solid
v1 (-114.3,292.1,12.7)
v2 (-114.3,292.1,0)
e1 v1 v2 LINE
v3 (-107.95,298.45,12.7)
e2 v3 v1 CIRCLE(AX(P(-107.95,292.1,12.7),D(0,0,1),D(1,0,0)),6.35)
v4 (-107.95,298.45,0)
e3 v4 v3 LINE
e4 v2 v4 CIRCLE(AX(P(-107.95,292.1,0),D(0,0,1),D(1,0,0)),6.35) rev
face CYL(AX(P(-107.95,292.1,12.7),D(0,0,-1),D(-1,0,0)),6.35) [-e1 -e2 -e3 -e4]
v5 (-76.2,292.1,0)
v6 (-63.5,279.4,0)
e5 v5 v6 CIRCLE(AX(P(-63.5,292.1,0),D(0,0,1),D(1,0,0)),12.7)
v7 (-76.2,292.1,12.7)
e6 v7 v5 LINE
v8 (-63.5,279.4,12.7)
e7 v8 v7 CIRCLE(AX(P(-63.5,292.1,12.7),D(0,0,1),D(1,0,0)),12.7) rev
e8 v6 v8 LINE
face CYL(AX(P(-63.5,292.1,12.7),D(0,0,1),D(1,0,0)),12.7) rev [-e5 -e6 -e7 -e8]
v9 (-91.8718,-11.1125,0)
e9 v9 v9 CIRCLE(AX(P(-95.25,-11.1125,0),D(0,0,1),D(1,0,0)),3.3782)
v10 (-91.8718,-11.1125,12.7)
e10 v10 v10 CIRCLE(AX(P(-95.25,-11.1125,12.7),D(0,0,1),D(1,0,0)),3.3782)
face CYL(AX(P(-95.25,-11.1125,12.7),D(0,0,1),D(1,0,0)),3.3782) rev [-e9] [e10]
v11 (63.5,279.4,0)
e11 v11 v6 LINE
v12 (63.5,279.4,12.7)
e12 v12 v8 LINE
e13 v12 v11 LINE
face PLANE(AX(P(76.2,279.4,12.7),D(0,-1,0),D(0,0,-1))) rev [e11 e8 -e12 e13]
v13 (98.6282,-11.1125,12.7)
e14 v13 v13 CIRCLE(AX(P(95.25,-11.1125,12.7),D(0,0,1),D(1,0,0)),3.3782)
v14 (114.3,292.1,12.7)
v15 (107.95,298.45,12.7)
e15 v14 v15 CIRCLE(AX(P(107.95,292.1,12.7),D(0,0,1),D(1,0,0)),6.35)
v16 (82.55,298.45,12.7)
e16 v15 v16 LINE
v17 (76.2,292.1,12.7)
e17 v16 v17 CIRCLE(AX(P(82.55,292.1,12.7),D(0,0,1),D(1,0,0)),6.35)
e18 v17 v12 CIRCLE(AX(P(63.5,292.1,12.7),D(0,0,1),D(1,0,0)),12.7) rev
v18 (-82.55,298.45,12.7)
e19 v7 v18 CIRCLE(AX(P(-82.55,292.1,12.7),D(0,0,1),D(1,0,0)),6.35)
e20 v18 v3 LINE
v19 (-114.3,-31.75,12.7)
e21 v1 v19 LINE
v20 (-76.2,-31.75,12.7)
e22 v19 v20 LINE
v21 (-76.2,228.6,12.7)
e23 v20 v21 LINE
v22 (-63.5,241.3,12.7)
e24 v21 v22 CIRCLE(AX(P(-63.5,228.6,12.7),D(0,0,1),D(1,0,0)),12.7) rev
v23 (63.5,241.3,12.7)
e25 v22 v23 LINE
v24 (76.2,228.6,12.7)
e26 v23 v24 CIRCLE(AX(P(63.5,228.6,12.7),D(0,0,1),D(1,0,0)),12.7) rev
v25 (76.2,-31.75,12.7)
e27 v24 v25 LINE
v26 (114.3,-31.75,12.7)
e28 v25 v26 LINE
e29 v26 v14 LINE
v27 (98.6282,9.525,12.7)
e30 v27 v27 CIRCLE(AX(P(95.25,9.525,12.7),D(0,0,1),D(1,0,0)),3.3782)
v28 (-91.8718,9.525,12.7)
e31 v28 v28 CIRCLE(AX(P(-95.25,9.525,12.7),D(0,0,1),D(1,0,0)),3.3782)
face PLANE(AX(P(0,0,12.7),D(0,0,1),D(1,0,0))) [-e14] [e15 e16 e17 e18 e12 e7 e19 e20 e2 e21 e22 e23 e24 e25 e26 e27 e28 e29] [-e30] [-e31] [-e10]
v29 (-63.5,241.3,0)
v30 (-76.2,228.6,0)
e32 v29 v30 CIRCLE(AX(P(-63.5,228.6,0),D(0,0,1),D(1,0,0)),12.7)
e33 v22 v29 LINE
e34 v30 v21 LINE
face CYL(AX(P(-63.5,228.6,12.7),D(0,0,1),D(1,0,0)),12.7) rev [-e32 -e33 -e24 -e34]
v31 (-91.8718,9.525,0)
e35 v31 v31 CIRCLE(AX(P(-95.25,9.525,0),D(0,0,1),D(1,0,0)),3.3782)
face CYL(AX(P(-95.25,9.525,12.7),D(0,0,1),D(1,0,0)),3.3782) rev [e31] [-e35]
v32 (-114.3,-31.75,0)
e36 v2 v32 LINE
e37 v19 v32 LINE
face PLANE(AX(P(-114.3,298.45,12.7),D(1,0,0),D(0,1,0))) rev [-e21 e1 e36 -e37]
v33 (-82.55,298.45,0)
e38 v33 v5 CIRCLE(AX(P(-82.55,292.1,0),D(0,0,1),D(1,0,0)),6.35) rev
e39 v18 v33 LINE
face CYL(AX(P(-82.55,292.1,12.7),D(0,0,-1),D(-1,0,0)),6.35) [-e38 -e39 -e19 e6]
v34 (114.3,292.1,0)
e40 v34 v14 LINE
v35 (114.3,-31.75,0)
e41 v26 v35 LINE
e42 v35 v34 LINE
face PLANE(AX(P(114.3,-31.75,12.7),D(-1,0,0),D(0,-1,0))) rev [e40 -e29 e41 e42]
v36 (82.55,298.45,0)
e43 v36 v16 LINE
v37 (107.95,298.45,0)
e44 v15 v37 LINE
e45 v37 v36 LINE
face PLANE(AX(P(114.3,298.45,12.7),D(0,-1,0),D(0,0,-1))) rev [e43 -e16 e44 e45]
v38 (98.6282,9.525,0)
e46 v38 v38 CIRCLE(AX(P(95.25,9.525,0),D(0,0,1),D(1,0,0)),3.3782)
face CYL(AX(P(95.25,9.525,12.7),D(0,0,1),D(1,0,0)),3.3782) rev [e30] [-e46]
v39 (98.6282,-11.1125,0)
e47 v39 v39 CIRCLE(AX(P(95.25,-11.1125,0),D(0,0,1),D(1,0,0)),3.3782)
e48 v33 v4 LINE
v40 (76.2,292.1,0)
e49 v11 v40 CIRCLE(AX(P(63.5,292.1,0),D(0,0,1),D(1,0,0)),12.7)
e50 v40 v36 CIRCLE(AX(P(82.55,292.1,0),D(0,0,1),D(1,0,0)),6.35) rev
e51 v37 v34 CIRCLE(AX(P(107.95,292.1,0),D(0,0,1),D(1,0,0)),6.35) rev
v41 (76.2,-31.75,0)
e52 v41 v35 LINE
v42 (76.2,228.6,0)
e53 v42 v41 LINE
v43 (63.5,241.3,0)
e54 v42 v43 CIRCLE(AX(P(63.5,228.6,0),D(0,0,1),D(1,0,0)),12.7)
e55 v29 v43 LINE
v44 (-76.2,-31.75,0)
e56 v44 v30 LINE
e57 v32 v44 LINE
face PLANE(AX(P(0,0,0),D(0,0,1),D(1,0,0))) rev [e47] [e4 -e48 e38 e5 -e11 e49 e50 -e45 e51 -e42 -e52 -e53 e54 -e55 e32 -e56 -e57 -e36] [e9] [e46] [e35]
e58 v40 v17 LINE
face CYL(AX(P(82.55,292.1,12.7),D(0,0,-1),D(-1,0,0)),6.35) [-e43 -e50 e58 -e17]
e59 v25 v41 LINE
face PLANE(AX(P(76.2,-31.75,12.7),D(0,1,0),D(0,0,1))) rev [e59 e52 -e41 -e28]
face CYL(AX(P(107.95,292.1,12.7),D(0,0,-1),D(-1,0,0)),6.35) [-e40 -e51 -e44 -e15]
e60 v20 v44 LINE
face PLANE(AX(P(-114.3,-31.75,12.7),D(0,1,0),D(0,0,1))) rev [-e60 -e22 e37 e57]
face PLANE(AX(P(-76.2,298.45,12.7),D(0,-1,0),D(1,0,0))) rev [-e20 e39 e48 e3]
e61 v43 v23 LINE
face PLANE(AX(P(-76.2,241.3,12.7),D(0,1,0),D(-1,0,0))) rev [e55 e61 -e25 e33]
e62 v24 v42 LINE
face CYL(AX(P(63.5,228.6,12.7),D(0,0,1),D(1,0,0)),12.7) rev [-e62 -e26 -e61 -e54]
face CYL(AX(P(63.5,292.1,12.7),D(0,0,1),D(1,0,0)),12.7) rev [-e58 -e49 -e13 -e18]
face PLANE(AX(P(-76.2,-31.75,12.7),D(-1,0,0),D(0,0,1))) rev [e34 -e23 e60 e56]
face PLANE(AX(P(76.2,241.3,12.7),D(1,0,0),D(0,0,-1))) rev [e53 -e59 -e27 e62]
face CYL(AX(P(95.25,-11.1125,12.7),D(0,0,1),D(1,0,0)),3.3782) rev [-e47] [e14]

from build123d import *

# Parameters (mm, degrees)
BOSS_EXTRUDE1_DEPTH         = 12.7
F_1_4_CLEARANCE_HOLE1_D     = 6.7564
F_1_4_CLEARANCE_HOLE1_DEPTH = 219.964
F_1_4_CLEARANCE_HOLE1_TIP   = 2.029827343
FILLET1_R                   = 12.7
FILLET2_R                   = 6.35


with BuildPart() as part:
    # Sketch1 → Boss-Extrude1 (new body)
    with BuildSketch(Plane.XY):
        Polygon((-114.3, -31.75), (-76.2, -31.75), (-76.2, 241.3), (76.2, 241.3), (76.2, -31.75), (114.3, -31.75), (114.3, 298.45), (76.2, 298.45), (76.2, 279.4), (-76.2, 279.4), (-76.2, 298.45), (-114.3, 298.45), align=None)
    extrude(amount=BOSS_EXTRUDE1_DEPTH)

    # 1/4 Clearance Hole1
    with Locations(Plane.XY.offset(12.7)):
        with Locations((-95.25, -11.1125), (-95.25, 9.525), (95.25, -11.1125), (95.25, 9.525)):
            Hole(F_1_4_CLEARANCE_HOLE1_D / 2, depth=F_1_4_CLEARANCE_HOLE1_DEPTH)
            with Locations((0, 0, -(F_1_4_CLEARANCE_HOLE1_DEPTH + F_1_4_CLEARANCE_HOLE1_TIP / 2))):  # 118° drill point
                Cone(0, F_1_4_CLEARANCE_HOLE1_D / 2, F_1_4_CLEARANCE_HOLE1_TIP, mode=Mode.SUBTRACT)

    # Fillet1
    fillet1_edges = [part.edges().sort_by_distance(p)[0] for p in [
        (-76.2, 279.4, 6.35),
        (76.2, 279.4, 6.35),
        (76.2, 241.3, 6.35),
        (-76.2, 241.3, 6.35),
    ]]
    fillet(fillet1_edges, radius=FILLET1_R)

    # Fillet2
    fillet2_edges = [part.edges().sort_by_distance(p)[0] for p in [
        (114.3, 298.45, 6.35),
        (76.2, 298.45, 6.35),
        (-114.3, 298.45, 6.35),
        (-76.2, 298.45, 6.35),
    ]]
    fillet(fillet2_edges, radius=FILLET2_R - 0.0001)  # a hair under: the kernel refuses the full size


solid = part.part
